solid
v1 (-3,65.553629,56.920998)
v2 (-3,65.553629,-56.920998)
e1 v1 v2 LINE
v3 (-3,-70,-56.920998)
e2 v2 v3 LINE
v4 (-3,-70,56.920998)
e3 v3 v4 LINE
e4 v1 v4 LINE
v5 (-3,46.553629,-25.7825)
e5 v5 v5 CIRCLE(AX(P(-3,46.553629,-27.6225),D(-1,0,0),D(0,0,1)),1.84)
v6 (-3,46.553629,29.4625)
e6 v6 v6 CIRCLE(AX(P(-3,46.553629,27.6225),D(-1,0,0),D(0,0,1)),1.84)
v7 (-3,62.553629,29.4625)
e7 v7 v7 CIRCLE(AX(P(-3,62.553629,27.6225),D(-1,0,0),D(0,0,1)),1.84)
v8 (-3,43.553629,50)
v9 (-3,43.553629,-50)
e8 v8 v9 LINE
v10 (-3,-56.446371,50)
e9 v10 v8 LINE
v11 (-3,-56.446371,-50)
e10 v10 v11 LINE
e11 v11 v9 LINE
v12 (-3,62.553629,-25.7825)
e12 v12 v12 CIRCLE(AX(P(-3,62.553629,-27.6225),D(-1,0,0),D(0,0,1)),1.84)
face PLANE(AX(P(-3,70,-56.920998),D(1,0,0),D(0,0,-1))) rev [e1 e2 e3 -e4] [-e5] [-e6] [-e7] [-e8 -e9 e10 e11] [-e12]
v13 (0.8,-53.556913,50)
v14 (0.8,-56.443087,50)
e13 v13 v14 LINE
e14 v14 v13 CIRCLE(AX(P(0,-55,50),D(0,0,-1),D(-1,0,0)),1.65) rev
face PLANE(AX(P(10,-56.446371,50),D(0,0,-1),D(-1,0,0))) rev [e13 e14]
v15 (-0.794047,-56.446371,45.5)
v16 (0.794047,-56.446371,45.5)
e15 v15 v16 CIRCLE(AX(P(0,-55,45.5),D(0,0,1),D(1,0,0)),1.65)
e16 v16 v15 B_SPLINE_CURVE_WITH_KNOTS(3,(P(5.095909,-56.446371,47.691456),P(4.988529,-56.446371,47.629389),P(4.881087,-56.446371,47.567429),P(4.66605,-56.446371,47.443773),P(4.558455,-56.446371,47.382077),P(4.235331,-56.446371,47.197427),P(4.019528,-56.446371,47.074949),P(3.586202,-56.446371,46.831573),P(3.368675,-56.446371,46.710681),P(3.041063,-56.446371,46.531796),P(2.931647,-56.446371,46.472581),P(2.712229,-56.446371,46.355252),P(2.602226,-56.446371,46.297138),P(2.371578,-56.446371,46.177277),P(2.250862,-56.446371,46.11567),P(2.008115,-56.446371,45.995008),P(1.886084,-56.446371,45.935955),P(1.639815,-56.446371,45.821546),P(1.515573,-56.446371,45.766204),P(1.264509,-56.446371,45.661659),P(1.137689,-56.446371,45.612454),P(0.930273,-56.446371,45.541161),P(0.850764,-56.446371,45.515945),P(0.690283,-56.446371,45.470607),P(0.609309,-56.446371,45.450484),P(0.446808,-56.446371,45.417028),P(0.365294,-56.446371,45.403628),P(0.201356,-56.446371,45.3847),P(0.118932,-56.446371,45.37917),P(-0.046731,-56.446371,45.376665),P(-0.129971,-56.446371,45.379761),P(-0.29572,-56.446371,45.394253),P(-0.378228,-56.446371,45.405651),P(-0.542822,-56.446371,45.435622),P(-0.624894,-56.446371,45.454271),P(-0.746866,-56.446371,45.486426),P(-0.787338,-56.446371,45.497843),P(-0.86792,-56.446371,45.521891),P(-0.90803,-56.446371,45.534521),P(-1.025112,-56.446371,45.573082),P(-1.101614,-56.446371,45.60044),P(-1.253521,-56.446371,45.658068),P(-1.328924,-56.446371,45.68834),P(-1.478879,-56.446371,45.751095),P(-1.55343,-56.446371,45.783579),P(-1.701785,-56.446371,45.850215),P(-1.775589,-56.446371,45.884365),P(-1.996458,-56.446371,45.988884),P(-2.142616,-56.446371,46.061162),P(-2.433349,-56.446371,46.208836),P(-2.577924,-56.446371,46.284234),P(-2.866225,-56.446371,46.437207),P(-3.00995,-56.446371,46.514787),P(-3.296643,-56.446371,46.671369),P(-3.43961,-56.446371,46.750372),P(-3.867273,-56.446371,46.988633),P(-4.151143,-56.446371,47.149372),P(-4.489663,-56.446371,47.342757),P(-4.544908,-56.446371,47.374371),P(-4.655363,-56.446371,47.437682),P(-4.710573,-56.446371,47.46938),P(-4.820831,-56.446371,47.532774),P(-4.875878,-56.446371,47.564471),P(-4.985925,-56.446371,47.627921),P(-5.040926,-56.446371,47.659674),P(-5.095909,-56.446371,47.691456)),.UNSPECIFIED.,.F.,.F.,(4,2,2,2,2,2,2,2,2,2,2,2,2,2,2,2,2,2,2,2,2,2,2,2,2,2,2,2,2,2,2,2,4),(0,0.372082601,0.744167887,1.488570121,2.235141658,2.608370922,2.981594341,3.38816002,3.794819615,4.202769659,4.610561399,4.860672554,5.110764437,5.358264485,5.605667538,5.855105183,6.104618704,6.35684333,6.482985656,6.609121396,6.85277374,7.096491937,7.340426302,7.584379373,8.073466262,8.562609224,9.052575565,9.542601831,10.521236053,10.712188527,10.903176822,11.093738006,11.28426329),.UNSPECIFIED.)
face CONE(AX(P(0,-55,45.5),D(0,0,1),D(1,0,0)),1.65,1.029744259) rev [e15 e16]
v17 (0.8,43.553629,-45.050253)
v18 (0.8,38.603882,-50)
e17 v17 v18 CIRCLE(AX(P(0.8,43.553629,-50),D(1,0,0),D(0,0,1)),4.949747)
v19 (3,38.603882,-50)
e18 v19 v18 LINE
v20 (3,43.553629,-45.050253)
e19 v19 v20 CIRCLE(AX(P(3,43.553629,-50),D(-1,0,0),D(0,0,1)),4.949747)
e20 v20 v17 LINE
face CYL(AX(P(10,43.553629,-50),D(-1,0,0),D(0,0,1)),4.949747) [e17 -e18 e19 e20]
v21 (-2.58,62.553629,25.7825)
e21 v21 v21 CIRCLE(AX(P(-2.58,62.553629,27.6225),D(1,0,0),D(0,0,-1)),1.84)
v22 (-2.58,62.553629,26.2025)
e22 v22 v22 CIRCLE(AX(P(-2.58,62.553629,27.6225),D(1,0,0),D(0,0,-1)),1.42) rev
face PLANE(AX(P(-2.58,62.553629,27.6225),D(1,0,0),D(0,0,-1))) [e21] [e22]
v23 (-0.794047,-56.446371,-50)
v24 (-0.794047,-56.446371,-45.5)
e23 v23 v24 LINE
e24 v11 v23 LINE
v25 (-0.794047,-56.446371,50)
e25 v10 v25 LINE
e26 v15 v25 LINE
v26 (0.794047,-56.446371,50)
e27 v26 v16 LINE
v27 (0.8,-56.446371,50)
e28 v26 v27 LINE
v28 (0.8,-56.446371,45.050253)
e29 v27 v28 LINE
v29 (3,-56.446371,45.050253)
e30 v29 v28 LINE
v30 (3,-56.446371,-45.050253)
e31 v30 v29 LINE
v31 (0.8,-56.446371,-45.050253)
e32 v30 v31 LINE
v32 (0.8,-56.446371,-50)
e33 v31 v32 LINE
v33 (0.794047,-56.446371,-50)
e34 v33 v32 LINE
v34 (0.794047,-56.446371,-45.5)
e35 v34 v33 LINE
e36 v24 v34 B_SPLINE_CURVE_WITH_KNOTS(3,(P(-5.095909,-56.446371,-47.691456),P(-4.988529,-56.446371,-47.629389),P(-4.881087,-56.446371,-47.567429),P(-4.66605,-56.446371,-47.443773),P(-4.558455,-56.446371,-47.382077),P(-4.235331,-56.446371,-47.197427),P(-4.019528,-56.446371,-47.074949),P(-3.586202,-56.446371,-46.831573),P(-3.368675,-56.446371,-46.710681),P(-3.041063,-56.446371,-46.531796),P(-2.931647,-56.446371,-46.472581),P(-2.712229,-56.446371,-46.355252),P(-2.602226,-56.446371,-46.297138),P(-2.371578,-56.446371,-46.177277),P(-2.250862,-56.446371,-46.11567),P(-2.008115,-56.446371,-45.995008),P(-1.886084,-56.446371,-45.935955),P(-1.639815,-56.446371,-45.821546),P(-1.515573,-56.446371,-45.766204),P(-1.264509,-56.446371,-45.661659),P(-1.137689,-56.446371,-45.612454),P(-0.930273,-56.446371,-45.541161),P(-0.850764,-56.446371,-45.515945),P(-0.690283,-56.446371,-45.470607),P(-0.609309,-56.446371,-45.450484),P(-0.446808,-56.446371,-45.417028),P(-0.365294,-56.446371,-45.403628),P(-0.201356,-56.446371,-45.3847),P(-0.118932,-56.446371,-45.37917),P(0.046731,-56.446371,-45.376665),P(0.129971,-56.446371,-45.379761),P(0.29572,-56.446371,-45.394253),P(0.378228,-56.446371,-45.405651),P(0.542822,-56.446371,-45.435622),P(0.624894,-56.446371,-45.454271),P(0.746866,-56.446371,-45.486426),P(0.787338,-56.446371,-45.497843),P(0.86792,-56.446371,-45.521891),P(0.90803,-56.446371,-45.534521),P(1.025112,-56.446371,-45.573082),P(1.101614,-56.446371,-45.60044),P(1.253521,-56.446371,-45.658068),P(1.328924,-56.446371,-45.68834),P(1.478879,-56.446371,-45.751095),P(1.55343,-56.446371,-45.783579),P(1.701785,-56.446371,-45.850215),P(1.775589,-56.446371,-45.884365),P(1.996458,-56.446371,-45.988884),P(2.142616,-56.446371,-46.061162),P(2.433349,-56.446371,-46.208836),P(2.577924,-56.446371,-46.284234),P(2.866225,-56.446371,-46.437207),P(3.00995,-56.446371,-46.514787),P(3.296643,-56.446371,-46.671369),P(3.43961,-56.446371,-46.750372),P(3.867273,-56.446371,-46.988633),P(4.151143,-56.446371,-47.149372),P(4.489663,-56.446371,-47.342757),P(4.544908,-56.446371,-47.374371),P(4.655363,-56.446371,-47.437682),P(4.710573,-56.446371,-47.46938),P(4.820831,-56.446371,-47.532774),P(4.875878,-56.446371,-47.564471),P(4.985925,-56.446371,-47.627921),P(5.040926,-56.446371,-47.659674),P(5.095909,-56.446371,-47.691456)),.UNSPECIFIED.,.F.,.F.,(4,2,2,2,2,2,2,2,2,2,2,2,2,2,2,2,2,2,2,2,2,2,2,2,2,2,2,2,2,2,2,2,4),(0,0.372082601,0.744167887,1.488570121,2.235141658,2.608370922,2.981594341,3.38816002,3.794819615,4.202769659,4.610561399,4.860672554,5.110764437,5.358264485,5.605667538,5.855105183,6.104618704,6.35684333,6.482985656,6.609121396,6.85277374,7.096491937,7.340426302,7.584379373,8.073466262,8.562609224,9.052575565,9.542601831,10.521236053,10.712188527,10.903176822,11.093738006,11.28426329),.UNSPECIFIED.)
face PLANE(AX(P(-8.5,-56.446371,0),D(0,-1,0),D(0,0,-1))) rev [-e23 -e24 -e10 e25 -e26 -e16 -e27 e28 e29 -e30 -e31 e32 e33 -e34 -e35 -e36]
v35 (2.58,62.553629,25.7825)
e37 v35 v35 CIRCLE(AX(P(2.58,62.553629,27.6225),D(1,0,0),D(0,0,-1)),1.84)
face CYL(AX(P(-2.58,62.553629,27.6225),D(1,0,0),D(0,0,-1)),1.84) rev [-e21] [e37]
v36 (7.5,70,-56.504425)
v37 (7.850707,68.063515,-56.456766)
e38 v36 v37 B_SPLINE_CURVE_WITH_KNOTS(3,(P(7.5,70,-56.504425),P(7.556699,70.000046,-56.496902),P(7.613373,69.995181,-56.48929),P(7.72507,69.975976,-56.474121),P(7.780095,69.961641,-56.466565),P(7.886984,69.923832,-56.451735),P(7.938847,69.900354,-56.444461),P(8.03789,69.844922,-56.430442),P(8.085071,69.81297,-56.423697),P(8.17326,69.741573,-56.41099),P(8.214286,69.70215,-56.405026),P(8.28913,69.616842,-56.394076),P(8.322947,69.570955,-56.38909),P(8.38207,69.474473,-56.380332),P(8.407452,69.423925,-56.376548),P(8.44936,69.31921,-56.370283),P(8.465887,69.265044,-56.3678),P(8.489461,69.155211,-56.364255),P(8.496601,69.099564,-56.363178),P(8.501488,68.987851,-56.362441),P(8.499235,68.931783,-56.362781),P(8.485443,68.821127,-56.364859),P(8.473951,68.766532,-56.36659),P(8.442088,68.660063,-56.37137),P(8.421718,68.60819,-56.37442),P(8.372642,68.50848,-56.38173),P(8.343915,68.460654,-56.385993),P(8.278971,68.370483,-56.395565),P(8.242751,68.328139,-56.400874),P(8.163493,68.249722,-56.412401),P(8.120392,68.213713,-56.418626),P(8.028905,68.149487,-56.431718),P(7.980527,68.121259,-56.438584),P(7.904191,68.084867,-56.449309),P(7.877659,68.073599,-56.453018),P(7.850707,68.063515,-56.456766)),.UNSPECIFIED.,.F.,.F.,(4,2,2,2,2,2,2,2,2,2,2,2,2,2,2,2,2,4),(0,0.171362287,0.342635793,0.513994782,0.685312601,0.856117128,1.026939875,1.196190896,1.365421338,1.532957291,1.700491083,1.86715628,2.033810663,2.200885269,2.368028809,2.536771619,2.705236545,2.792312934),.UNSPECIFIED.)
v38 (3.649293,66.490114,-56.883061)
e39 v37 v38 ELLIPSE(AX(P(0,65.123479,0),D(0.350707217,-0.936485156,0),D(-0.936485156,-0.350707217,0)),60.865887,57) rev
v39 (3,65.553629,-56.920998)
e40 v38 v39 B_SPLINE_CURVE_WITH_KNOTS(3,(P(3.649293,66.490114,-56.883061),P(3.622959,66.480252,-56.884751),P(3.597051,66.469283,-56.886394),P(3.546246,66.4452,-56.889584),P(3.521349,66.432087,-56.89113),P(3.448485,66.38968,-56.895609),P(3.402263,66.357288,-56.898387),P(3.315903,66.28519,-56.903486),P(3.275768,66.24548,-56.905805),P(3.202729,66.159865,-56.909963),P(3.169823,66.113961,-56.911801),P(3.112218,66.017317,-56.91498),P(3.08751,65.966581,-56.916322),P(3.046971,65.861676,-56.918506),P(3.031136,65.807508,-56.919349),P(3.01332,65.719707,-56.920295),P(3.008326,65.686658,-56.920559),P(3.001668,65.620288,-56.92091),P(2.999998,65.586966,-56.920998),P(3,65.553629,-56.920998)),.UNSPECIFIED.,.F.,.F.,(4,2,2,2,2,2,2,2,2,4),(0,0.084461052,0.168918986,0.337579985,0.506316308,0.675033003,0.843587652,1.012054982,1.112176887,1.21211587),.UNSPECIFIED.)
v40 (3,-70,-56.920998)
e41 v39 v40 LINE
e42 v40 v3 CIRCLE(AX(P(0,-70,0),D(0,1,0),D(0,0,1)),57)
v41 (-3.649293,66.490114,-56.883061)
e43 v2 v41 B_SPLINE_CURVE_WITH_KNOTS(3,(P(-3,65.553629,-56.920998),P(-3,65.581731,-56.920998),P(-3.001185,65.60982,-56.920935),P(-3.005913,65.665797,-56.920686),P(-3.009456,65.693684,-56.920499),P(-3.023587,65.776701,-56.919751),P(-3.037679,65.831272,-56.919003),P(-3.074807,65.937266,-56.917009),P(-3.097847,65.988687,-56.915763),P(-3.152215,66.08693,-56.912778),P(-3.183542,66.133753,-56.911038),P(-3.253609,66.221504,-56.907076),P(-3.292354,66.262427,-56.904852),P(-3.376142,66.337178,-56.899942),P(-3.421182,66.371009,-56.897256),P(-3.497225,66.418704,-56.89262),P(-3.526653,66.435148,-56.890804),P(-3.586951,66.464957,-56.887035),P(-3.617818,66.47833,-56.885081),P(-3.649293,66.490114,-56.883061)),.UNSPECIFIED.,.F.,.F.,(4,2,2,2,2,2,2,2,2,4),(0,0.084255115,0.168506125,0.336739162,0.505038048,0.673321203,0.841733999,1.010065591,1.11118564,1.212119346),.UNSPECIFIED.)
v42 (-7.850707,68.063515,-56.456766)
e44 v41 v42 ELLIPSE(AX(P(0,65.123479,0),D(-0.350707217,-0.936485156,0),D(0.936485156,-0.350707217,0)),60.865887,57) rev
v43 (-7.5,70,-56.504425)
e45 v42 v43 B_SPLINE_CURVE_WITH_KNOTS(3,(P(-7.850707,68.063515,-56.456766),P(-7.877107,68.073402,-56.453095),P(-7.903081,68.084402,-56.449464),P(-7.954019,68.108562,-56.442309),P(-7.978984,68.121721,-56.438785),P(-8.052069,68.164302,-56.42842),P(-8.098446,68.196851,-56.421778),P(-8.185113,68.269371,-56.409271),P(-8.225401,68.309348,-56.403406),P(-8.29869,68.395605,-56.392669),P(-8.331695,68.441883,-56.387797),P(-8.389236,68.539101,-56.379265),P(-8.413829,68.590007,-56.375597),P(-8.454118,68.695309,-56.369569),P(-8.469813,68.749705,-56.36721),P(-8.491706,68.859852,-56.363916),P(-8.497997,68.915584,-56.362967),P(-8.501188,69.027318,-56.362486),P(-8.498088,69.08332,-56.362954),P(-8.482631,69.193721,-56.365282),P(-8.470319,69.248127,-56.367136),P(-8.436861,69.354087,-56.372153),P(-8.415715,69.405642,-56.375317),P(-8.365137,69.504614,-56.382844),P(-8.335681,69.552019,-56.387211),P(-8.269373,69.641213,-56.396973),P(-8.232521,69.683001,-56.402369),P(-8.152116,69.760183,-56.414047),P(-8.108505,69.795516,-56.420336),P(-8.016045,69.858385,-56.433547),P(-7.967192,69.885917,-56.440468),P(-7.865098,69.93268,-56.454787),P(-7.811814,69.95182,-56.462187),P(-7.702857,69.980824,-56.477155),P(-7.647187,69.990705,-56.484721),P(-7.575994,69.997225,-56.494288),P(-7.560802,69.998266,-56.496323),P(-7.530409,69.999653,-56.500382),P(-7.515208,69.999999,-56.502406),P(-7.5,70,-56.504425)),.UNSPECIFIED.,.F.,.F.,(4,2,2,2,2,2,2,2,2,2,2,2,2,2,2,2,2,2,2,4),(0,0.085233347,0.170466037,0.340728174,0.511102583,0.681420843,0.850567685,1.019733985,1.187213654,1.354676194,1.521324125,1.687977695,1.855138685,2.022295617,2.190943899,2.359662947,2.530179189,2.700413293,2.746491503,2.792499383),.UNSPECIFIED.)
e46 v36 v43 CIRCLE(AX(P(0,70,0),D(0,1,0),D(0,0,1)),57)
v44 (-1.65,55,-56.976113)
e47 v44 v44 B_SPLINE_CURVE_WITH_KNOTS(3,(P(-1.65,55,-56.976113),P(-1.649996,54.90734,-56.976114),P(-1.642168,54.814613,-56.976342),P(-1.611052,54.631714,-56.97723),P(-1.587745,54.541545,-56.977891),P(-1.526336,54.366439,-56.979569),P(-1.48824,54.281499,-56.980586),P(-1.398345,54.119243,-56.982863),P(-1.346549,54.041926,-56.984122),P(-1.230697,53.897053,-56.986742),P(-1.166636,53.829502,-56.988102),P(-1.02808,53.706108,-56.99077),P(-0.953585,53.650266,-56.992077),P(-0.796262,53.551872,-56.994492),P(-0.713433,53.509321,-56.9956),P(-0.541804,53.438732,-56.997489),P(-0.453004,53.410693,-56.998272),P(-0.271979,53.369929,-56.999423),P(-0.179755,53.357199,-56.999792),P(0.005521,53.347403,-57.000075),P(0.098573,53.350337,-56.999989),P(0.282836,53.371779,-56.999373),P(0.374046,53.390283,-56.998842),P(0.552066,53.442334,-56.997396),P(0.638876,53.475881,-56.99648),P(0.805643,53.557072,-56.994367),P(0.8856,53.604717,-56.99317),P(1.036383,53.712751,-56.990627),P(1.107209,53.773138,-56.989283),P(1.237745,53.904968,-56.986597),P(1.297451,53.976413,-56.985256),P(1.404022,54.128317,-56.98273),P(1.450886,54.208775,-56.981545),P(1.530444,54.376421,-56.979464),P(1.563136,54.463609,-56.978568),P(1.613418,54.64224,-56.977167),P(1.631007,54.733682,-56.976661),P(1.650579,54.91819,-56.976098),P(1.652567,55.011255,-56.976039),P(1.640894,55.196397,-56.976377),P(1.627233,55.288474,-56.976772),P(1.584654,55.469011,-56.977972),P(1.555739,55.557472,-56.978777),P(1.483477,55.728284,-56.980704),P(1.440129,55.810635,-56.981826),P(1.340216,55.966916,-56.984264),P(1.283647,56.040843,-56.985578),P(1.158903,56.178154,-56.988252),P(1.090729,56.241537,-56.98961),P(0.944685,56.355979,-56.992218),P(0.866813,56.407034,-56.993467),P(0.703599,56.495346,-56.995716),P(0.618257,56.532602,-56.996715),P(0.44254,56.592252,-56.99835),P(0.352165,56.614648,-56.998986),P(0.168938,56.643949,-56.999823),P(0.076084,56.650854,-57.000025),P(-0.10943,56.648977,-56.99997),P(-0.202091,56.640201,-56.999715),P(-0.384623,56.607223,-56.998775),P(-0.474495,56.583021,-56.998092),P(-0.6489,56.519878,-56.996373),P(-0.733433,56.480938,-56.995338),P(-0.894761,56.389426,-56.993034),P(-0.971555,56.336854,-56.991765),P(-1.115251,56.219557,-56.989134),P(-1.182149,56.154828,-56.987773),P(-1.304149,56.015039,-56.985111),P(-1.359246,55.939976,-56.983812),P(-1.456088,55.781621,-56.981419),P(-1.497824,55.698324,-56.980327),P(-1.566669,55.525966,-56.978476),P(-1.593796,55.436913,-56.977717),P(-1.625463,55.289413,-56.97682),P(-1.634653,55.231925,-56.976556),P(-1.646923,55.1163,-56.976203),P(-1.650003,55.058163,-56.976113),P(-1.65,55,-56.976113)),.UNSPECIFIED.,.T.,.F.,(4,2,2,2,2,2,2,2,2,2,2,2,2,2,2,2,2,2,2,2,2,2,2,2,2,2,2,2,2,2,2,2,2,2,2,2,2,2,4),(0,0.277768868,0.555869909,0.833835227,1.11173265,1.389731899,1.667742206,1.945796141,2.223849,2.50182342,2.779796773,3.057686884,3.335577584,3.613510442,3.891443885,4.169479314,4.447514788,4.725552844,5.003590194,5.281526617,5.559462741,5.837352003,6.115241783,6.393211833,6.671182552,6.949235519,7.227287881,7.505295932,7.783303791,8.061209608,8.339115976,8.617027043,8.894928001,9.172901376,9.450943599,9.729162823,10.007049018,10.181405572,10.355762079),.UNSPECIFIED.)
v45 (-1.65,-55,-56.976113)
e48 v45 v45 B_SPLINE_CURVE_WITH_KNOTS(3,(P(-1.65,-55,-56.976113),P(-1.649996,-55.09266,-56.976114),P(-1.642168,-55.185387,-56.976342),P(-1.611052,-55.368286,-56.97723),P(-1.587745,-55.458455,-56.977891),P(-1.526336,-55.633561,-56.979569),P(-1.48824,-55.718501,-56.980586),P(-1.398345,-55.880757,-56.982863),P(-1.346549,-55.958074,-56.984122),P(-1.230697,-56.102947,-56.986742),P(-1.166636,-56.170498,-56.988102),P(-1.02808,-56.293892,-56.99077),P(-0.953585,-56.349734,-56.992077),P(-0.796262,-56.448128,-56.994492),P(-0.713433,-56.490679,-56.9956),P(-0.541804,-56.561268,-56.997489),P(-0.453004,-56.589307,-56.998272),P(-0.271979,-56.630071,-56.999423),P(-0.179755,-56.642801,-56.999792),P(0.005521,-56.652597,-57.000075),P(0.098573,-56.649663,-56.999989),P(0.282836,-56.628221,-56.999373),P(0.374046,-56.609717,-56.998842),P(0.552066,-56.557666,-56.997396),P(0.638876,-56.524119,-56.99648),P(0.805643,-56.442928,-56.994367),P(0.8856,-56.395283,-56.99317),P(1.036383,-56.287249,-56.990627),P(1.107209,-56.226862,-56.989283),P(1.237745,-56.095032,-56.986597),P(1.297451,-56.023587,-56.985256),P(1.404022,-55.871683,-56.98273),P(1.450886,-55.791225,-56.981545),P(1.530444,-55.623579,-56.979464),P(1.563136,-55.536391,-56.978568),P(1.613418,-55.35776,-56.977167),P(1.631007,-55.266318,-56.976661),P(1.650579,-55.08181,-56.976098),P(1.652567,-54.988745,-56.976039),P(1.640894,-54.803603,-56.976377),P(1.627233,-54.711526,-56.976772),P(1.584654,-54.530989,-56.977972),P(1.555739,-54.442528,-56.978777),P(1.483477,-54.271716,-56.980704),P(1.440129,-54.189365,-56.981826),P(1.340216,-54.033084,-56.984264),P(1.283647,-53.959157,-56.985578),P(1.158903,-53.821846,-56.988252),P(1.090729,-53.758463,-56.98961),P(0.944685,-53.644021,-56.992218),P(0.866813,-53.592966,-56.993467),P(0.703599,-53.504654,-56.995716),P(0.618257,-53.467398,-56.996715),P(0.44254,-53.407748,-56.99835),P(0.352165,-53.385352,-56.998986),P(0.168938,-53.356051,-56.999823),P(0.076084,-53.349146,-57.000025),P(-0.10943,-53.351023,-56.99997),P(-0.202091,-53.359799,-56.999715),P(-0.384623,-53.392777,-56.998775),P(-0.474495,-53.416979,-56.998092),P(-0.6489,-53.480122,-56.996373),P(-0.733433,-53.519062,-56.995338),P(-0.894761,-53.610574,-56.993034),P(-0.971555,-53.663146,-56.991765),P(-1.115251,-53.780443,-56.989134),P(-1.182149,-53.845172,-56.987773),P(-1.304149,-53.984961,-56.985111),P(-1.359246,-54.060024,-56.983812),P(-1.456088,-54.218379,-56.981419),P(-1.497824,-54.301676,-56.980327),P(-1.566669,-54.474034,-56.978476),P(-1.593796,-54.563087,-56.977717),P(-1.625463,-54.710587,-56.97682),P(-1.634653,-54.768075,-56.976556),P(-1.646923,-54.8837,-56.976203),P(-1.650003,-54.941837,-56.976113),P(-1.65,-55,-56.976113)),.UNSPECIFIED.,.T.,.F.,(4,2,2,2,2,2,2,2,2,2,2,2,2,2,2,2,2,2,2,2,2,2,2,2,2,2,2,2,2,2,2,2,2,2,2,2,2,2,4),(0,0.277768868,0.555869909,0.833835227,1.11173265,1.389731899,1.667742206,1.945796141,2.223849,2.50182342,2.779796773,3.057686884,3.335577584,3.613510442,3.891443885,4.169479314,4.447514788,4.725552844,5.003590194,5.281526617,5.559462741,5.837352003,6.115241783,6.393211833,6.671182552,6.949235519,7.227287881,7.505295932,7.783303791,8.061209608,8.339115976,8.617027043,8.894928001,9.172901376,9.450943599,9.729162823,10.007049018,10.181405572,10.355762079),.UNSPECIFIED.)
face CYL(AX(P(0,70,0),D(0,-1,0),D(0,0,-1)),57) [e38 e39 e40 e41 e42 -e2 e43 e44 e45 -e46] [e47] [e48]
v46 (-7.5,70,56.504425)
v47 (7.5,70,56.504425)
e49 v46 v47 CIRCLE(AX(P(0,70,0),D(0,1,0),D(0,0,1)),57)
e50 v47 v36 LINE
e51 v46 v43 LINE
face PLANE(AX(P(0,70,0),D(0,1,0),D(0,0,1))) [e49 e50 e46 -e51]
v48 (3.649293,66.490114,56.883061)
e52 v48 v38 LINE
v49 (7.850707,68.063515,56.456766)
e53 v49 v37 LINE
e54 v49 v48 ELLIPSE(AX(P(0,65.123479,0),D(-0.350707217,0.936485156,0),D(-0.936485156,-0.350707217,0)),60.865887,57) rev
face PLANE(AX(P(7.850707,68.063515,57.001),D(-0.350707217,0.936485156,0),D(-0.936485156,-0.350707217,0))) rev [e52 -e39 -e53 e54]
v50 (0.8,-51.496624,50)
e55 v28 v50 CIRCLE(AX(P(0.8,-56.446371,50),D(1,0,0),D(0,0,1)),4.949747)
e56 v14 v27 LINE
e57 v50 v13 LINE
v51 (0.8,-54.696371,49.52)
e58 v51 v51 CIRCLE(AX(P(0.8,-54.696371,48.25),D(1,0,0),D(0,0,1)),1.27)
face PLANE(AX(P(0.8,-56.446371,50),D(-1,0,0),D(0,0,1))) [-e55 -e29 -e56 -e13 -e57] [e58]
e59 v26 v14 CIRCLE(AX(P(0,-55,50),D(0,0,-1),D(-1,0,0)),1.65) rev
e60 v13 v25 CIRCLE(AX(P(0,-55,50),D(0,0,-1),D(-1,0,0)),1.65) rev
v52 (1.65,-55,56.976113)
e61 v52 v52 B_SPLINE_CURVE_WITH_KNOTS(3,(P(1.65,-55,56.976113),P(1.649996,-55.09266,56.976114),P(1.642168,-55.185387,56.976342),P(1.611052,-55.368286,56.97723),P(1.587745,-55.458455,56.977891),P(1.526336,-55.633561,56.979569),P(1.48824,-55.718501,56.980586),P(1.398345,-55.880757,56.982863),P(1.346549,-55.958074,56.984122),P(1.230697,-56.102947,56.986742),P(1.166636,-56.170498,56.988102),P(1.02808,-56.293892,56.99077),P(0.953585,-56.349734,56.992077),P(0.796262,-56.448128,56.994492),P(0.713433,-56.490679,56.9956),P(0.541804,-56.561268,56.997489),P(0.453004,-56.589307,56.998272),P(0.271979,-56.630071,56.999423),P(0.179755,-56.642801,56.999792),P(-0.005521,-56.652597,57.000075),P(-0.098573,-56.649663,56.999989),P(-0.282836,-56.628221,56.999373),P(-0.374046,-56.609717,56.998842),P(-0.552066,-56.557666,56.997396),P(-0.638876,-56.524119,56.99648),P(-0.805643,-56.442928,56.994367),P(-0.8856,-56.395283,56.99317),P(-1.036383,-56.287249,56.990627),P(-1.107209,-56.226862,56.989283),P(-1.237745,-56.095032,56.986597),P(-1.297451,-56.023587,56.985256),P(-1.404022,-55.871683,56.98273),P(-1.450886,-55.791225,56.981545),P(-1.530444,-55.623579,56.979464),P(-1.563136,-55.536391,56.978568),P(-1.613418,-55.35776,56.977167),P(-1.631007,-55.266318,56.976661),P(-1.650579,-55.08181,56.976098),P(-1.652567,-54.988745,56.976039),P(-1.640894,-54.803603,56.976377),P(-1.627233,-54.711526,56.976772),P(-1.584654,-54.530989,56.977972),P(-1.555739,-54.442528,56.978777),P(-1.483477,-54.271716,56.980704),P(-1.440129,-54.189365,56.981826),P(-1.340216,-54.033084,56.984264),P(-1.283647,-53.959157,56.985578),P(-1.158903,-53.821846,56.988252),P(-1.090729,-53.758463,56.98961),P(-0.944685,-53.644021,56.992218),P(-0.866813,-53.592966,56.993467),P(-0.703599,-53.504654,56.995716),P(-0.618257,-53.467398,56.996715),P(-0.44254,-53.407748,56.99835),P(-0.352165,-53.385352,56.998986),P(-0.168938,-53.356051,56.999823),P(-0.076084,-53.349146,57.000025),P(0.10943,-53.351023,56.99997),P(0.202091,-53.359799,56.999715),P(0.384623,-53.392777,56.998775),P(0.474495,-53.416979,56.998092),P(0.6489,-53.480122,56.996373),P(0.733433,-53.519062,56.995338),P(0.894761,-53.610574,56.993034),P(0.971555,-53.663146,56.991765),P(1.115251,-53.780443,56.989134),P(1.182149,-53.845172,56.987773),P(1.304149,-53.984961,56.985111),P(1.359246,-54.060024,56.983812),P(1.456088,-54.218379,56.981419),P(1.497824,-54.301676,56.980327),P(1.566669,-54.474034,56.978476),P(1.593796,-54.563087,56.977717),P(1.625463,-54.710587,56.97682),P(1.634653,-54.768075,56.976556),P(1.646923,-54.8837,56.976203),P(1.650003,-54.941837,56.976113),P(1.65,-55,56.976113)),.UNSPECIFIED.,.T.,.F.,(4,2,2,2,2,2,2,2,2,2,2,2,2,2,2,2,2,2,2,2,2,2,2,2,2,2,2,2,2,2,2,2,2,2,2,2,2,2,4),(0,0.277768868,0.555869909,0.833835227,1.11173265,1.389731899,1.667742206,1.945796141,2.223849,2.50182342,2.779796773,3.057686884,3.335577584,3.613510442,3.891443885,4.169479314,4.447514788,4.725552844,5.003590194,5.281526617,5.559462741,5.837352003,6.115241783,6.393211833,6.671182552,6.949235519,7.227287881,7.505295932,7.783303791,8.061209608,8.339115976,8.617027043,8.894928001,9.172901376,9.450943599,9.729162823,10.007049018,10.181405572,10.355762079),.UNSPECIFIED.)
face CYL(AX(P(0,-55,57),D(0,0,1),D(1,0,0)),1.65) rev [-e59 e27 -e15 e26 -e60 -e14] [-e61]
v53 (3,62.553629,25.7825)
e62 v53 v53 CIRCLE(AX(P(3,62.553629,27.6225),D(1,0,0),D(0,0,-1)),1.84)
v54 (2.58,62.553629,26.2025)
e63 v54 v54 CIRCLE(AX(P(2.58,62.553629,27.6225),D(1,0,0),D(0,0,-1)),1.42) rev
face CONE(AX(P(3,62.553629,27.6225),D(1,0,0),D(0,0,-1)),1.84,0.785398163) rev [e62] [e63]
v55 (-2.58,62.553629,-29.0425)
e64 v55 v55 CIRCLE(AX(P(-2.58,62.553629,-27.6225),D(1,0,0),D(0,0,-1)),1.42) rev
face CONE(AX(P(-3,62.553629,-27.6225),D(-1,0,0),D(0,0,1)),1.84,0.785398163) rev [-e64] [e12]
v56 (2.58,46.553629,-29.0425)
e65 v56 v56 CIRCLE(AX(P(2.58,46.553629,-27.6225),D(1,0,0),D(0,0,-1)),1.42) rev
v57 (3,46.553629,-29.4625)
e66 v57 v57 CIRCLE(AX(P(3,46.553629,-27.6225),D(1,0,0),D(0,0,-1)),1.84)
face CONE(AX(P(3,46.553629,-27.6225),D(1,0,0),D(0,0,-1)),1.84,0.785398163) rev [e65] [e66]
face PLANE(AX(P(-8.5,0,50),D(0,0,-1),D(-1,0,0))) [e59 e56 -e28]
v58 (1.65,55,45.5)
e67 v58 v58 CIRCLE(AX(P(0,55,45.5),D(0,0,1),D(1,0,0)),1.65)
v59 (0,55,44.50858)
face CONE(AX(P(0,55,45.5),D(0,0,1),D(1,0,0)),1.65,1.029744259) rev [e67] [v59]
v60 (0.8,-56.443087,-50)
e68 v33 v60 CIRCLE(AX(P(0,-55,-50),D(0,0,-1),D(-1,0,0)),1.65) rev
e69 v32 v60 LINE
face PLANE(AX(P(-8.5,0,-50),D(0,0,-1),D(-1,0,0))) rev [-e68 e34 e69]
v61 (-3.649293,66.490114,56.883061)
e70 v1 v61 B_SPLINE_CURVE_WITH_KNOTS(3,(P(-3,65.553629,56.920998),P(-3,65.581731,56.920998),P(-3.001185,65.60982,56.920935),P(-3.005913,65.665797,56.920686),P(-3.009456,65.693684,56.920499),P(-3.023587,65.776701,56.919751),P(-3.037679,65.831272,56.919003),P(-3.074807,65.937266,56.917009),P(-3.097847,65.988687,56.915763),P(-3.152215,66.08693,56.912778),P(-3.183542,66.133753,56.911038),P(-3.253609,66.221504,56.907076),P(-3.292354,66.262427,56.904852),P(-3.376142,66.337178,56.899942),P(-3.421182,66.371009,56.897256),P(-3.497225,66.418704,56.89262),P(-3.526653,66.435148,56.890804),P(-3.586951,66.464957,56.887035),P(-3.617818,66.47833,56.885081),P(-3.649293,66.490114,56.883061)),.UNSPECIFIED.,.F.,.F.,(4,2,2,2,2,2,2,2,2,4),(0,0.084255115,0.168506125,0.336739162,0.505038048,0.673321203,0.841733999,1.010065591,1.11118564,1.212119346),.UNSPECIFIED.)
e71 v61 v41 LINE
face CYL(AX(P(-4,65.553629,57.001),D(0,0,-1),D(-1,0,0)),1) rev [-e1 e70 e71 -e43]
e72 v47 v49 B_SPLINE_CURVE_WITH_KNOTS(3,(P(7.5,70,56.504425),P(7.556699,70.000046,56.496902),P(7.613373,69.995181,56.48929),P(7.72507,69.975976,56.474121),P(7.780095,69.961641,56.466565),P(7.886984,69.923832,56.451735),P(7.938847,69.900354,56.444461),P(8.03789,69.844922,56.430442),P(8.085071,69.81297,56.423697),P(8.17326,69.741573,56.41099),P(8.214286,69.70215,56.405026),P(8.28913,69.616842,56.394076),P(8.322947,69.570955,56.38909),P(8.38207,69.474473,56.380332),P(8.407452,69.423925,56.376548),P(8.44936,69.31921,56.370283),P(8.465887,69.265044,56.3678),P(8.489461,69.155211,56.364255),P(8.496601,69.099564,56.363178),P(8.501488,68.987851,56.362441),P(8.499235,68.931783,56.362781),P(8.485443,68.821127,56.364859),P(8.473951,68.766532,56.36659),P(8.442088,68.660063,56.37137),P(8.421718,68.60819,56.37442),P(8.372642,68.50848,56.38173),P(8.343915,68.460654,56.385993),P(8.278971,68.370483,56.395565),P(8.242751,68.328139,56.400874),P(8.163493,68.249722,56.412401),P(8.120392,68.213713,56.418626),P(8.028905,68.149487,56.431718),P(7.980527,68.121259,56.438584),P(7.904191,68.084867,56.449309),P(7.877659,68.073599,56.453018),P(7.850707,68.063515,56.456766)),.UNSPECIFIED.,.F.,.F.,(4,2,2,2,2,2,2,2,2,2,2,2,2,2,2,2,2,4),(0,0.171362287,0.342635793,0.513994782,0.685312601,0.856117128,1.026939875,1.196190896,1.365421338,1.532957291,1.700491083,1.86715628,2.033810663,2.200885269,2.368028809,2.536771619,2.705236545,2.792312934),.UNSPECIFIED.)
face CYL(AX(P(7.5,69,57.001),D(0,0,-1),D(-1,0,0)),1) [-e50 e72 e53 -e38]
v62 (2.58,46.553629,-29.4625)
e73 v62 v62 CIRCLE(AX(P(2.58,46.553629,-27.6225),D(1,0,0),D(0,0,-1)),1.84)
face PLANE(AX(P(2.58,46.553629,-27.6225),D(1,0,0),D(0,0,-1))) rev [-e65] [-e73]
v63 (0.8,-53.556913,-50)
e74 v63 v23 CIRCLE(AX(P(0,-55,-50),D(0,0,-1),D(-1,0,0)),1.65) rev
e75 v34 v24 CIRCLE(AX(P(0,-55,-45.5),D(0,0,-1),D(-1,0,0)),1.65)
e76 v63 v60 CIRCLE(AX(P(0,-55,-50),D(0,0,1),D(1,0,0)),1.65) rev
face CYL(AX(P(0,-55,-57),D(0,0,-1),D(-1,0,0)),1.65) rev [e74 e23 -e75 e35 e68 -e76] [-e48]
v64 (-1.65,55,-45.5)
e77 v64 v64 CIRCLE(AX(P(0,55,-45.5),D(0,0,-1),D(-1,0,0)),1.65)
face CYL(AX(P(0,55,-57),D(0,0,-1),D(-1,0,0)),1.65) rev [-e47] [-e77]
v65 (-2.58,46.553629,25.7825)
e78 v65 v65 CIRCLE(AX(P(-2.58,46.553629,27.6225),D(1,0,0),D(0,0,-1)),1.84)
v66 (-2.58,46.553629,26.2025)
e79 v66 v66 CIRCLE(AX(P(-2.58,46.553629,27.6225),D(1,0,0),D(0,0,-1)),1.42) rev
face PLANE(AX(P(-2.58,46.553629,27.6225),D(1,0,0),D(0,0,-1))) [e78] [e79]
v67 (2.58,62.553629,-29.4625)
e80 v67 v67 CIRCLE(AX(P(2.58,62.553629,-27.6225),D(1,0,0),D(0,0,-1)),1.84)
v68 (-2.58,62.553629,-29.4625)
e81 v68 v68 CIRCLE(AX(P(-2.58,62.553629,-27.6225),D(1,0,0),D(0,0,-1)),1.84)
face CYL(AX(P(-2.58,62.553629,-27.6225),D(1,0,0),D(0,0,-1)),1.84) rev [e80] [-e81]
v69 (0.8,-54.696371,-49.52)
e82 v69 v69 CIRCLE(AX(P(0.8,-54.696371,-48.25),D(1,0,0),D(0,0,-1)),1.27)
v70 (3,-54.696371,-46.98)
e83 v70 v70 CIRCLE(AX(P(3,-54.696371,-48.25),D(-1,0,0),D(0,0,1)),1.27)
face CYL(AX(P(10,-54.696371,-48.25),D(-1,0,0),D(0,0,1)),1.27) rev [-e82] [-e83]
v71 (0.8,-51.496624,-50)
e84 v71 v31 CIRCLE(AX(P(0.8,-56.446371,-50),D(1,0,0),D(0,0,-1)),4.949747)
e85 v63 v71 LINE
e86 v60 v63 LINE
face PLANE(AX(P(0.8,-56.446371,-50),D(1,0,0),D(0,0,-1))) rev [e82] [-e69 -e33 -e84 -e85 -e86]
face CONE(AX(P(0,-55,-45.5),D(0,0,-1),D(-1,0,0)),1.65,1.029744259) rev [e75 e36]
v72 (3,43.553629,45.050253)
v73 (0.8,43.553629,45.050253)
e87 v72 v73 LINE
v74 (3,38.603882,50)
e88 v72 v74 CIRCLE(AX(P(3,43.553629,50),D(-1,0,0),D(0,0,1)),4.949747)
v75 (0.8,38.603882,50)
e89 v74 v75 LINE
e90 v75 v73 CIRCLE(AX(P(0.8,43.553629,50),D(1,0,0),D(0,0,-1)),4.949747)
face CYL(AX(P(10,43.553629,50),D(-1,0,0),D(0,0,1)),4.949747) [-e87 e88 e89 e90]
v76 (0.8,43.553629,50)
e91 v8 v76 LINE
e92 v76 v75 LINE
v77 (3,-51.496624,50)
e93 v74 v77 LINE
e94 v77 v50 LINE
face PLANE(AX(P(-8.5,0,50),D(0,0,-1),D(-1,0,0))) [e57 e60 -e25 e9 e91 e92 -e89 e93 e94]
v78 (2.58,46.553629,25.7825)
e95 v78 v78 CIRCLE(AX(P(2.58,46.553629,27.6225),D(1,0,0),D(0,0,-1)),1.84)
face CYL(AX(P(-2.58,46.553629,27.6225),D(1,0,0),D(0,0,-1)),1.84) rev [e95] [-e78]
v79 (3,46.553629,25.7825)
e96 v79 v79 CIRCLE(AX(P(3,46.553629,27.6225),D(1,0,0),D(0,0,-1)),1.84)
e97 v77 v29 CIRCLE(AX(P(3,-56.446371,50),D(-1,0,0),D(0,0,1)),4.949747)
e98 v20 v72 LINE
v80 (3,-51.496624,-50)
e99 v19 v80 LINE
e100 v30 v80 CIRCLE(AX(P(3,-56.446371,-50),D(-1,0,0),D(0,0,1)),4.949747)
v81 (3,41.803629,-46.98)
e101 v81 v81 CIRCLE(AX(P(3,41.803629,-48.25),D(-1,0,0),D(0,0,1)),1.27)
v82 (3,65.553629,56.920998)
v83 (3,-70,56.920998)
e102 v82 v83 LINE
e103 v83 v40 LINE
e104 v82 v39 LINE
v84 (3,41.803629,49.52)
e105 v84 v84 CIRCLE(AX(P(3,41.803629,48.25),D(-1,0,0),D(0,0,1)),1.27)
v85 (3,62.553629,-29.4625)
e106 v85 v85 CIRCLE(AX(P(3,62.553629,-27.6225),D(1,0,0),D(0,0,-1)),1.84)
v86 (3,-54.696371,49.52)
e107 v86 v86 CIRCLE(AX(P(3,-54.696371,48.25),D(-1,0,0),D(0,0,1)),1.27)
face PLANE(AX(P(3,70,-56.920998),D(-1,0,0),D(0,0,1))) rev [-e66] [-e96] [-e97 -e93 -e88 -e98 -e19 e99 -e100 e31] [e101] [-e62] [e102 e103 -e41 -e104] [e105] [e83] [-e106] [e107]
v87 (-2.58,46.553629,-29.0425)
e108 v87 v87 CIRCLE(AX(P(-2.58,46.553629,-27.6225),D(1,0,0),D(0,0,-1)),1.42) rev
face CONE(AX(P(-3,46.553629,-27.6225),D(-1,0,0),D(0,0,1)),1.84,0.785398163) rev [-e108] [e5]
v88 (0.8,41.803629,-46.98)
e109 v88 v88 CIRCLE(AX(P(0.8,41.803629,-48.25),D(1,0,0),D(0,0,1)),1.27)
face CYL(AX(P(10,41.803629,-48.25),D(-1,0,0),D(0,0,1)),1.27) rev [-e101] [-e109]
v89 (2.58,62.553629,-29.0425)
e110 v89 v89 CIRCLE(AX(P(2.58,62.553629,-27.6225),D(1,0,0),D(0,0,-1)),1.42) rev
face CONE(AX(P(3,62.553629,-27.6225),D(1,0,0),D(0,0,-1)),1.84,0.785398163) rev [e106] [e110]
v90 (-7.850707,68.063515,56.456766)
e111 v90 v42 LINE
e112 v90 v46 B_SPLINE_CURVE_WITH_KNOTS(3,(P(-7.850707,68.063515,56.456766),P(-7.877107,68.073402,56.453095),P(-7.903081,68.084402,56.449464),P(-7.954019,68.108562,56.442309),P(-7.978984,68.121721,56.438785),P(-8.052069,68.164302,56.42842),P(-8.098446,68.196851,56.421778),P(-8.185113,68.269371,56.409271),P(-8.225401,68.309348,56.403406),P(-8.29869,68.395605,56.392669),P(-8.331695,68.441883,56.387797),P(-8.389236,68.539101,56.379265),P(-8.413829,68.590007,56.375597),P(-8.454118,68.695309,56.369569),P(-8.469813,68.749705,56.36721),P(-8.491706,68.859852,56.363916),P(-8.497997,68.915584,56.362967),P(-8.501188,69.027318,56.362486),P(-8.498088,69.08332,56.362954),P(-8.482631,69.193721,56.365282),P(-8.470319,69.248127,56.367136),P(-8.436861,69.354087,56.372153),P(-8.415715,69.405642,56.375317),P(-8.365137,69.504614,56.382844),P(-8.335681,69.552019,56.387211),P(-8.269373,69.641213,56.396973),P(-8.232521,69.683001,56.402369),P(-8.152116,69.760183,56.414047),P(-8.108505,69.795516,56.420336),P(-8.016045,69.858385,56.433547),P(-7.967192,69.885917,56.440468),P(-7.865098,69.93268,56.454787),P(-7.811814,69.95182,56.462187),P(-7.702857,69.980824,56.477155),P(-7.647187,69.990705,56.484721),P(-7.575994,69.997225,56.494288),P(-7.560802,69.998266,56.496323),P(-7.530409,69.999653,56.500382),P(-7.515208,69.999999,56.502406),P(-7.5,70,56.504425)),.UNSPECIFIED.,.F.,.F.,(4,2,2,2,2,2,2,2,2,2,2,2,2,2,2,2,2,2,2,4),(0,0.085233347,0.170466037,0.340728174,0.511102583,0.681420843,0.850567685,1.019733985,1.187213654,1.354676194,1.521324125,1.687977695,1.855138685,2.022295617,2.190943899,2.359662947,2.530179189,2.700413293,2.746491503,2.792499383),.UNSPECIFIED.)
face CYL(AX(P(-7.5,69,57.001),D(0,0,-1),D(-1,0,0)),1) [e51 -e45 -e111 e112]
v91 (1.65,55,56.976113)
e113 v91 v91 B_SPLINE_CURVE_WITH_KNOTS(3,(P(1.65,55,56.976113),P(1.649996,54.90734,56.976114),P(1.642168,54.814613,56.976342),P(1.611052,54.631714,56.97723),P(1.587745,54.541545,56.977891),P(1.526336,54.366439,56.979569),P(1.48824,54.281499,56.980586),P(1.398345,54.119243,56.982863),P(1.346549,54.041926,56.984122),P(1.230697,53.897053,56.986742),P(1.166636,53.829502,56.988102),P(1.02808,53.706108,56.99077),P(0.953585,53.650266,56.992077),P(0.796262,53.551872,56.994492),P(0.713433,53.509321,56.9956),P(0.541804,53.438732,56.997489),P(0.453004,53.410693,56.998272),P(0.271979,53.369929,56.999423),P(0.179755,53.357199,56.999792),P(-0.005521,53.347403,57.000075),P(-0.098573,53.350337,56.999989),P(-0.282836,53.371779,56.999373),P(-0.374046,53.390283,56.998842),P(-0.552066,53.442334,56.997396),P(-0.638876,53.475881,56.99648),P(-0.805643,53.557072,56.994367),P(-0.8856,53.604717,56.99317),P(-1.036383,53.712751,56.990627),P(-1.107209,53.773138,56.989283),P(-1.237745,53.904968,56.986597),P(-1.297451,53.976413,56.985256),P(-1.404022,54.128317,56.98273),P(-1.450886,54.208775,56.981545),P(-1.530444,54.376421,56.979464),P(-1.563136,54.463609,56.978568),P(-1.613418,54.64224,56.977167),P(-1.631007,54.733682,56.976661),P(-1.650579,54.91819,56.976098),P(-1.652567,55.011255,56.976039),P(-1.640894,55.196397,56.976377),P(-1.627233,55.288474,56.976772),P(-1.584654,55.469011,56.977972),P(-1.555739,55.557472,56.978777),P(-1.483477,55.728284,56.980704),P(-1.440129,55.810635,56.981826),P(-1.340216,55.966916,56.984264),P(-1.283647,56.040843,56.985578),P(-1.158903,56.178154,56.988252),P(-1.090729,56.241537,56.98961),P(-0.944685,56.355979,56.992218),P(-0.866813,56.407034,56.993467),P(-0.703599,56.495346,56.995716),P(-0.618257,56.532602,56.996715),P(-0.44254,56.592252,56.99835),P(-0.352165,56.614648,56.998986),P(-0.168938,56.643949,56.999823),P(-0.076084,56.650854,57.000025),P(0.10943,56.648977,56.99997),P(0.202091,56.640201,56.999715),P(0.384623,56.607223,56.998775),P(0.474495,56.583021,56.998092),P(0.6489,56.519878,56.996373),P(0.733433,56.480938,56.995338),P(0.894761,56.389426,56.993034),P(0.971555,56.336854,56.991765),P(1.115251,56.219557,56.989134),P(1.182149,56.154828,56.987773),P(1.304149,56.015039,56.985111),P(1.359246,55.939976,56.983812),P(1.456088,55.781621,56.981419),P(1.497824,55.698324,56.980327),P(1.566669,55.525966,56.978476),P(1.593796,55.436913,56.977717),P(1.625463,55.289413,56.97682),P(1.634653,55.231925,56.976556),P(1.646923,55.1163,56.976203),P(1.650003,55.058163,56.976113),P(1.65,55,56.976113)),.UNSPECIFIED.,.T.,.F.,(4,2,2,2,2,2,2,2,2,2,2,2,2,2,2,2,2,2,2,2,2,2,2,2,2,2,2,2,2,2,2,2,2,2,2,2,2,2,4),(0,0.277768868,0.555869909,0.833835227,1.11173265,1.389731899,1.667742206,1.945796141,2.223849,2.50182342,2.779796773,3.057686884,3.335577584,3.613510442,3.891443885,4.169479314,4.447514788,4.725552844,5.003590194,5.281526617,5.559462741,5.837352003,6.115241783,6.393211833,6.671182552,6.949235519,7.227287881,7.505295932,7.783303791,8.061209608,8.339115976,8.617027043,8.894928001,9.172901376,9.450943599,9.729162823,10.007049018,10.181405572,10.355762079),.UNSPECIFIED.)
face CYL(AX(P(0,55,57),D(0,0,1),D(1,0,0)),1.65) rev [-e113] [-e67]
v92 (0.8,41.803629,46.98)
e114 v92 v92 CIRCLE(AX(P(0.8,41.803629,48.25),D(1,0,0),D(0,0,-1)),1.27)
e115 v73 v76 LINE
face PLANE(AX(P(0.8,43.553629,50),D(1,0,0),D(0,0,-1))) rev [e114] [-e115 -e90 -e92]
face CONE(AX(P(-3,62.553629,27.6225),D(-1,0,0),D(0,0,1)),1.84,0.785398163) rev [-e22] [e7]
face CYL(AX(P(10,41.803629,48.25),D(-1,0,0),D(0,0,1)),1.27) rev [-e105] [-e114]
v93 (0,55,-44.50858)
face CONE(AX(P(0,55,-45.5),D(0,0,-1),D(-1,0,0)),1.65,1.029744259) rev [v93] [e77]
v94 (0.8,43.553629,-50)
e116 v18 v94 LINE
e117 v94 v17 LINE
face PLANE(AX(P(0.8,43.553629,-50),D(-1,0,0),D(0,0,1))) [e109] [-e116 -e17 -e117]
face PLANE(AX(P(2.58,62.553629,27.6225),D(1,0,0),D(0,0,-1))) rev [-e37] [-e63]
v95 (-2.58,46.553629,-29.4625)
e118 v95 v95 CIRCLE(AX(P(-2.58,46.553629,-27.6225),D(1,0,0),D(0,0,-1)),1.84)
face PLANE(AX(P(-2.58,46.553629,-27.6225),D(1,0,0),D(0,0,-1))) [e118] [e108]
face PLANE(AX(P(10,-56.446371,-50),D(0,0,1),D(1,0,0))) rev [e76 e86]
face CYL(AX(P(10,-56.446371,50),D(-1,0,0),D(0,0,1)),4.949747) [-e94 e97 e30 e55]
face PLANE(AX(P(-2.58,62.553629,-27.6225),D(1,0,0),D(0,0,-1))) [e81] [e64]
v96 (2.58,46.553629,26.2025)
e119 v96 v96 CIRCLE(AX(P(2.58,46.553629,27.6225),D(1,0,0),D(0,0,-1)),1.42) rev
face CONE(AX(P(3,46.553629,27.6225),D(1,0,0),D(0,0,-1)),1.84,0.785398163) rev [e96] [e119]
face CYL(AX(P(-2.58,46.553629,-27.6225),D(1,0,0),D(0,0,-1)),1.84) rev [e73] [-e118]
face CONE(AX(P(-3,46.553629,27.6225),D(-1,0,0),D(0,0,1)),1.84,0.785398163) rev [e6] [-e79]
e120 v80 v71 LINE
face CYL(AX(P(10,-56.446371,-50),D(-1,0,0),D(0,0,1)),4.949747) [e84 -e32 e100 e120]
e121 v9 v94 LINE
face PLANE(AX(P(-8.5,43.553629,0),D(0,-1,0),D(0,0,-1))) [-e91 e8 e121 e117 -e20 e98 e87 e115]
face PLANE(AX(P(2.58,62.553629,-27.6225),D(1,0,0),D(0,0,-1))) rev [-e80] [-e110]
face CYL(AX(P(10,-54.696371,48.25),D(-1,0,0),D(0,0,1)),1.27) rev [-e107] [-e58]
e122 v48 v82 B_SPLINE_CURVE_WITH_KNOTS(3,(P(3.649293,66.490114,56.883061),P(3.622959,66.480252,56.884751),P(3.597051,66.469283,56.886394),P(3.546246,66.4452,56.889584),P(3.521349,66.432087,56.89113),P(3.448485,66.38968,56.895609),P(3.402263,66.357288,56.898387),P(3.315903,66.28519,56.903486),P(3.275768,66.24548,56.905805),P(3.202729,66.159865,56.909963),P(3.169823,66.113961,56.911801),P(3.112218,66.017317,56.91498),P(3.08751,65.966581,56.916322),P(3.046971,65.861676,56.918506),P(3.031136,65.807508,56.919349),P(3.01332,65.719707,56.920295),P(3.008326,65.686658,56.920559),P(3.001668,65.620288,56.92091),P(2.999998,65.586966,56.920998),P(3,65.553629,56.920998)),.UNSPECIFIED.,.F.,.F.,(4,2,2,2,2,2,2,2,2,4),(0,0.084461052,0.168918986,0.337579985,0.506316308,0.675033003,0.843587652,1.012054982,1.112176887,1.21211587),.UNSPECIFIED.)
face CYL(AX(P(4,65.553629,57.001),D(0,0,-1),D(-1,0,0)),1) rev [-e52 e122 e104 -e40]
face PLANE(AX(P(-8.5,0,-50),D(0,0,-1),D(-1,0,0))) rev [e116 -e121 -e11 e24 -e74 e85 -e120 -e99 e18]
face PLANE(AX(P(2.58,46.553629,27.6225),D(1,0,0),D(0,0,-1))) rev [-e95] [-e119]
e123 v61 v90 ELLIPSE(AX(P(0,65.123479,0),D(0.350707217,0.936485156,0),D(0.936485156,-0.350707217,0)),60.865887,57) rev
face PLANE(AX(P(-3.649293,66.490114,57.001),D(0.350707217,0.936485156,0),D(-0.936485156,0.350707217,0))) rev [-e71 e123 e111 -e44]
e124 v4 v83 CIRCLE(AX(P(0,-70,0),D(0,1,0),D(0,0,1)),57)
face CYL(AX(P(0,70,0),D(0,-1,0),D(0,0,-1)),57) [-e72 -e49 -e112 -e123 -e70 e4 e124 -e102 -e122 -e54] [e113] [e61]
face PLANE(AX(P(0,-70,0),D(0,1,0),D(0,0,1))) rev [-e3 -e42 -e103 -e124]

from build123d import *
from build123d.topology import SkipClean

# Parameters (mm, degrees)
BOSS_EXTRUDE1_DEPTH                  = 70
M4_TAPPED_HOLE1_D                    = 3.3
M4_TAPPED_HOLE1_DEPTH                = 11.5
M4_TAPPED_HOLE1_TIP                  = 0.991420021
M4_TAPPED_HOLE1_ON_FACE_2_D          = 3.3
M4_TAPPED_HOLE1_ON_FACE_2_DEPTH      = 11.5
M4_TAPPED_HOLE1_ON_FACE_2_TIP        = 0.991420021
BOSS_EXTRUDE3_REACH                  = 92.322
BOSS_EXTRUDE3_END_RADIUS             = 57
BOSS_EXTRUDE3_DIRECTION_2_REACH      = 92.322
BOSS_EXTRUDE3_DIRECTION_2_END_RADIUS = 57
CUT_EXTRUDE4_DEPTH                   = 91.671109116
CUT_EXTRUDE4_DEPTH_BACK              = 91.671109116
SKETCH5_W                            = 100
SKETCH5_H                            = 100
BOSS_EXTRUDE4_START                  = 0.8
SKETCH6_R                            = 1.27
BOSS_EXTRUDE4_DEPTH                  = 2.2
SKETCH12_R                           = 1.84
CUT_EXTRUDE6_DEPTH                   = 2.58


# Read off the part's stored shape, not the designer's step: Hole1
with BuildPart() as part:
    # Sketch1 → Boss-Extrude1 (new, symmetric)
    with BuildSketch(Plane(origin=(0, 0, 0), x_dir=(1, 0, 0), z_dir=(0, 1, 0))):
        with BuildLine():
            Line((-3, 56.920997883), (-3, -56.920997883))
            ThreePointArc((-3, -56.920997883), (0, -57), (3, -56.920997883))
            Line((3, -56.920997883), (3, 56.920997883))
            ThreePointArc((3, 56.920997883), (0, 57), (-3, 56.920997883))
        make_face()
    extrude(amount=BOSS_EXTRUDE1_DEPTH, both=True)

    # M4 Tapped Hole1
    with Locations(Plane(origin=(0, 55, 57), x_dir=(1, 0, 0), z_dir=(0, 0, 1))):
        with Locations((0, 0), (0, -110)):
            Hole(M4_TAPPED_HOLE1_D / 2, depth=M4_TAPPED_HOLE1_DEPTH)
            with Locations((0, 0, -(M4_TAPPED_HOLE1_DEPTH + M4_TAPPED_HOLE1_TIP / 2))):  # 118° drill point
                Cone(0, M4_TAPPED_HOLE1_D / 2, M4_TAPPED_HOLE1_TIP, mode=Mode.SUBTRACT)

    # M4 Tapped Hole1 on face 2
    with Locations(Plane(origin=(0, 55, -57), x_dir=(-1, 0, 0), z_dir=(0, 0, -1))):
        with Locations((0, 0), (0, -110)):
            Hole(M4_TAPPED_HOLE1_ON_FACE_2_D / 2, depth=M4_TAPPED_HOLE1_ON_FACE_2_DEPTH)
            with Locations((0, 0, -(M4_TAPPED_HOLE1_ON_FACE_2_DEPTH + M4_TAPPED_HOLE1_ON_FACE_2_TIP / 2))):  # 118° drill point
                Cone(0, M4_TAPPED_HOLE1_ON_FACE_2_D / 2, M4_TAPPED_HOLE1_ON_FACE_2_TIP, mode=Mode.SUBTRACT)

    # Boss-Extrude3: up to this cylinder (the profile starts inside it)
    with SkipClean():  # the faces are left unmerged after this step: merging them gives an invalid solid
        boss_extrude3_end = Plane(origin=(0, 67.695148, 0), z_dir=(0, -1, 0)) * Cylinder(BOSS_EXTRUDE3_END_RADIUS, 299.644, mode=Mode.PRIVATE)
        # Sketch4 → Boss-Extrude3 (add, up to the surface)
        with BuildSketch(Plane.XY, mode=Mode.PRIVATE) as boss_extrude3_sk1:
            with BuildLine():
                Line((-7.5, 70), (7.5, 70))
                ThreePointArc((7.5, 70), (8.48399318, 69.178206122), (7.850707217, 68.063514844))
                Line((7.850707217, 68.063514844), (3.649292783, 66.490114182))
                ThreePointArc((3.649292783, 66.490114182), (3.178200993, 66.123406518), (3, 65.553629026))
                Line((3, 65.553629026), (3, 64))
                Line((3, 64), (-3, 64))
                Line((-3, 64), (-3, 65.553629026))
                ThreePointArc((-3, 65.553629026), (-3.178200993, 66.123406518), (-3.649292783, 66.490114182))
                Line((-3.649292783, 66.490114182), (-7.850707217, 68.063514844))
                ThreePointArc((-7.850707217, 68.063514844), (-8.48399318, 69.178206122), (-7.5, 70))
            make_face()
        boss_extrude3_tool1 = extrude(boss_extrude3_sk1.sketch, amount=BOSS_EXTRUDE3_REACH, mode=Mode.PRIVATE) & boss_extrude3_end
        add(boss_extrude3_tool1.solids().sort_by_distance((0, 67.695148, 0))[0])

    # Boss-Extrude3 direction 2: up to this cylinder (the profile starts inside it)
    with SkipClean():  # the faces are left unmerged after this step: merging them gives an invalid solid
        boss_extrude3_direction_2_end = Plane(origin=(0, 67.695148, 0), z_dir=(0, -1, 0)) * Cylinder(BOSS_EXTRUDE3_DIRECTION_2_END_RADIUS, 299.644, mode=Mode.PRIVATE)
        # Sketch4 → Boss-Extrude3 direction 2 (add, up to the surface)
        with BuildSketch(Plane.XY, mode=Mode.PRIVATE) as boss_extrude3_direction_2_sk1:
            with BuildLine():
                Line((-7.5, 70), (7.5, 70))
                ThreePointArc((7.5, 70), (8.48399318, 69.178206122), (7.850707217, 68.063514844))
                Line((7.850707217, 68.063514844), (3.649292783, 66.490114182))
                ThreePointArc((3.649292783, 66.490114182), (3.178200993, 66.123406518), (3, 65.553629026))
                Line((3, 65.553629026), (3, 64))
                Line((3, 64), (-3, 64))
                Line((-3, 64), (-3, 65.553629026))
                ThreePointArc((-3, 65.553629026), (-3.178200993, 66.123406518), (-3.649292783, 66.490114182))
                Line((-3.649292783, 66.490114182), (-7.850707217, 68.063514844))
                ThreePointArc((-7.850707217, 68.063514844), (-8.48399318, 69.178206122), (-7.5, 70))
            make_face()
        boss_extrude3_direction_2_tool1 = extrude(boss_extrude3_direction_2_sk1.sketch, amount=-BOSS_EXTRUDE3_DIRECTION_2_REACH, mode=Mode.PRIVATE) & boss_extrude3_direction_2_end
        add(boss_extrude3_direction_2_tool1.solids().sort_by_distance((0, 67.695148, 0))[0])

    # Sketch5 → Cut-Extrude4 (cut, two sides: drawn at the far end of the back side and taken through both)
    with SkipClean():  # the faces are left unmerged after this step: merging them gives an invalid solid
        with BuildSketch(Plane(origin=(0, 0, 0), x_dir=(0, 0, -1), z_dir=(1, 0, 0)).offset(-CUT_EXTRUDE4_DEPTH_BACK)):
            with Locations((0, -6.446370974)):
                Rectangle(SKETCH5_W, SKETCH5_H)
        extrude(amount=CUT_EXTRUDE4_DEPTH + CUT_EXTRUDE4_DEPTH_BACK, mode=Mode.SUBTRACT)

    # Sketch6 → Boss-Extrude4 (add)
    # profile 1 of 4: a face of its own
    with SkipClean():  # the faces are left unmerged after this step: merging them gives an invalid solid
        with BuildSketch(Plane(origin=(0, 0, 0), x_dir=(0, 0, -1), z_dir=(1, 0, 0)).offset(BOSS_EXTRUDE4_START)):
            with BuildLine():
                Line((50, 43.553629026), (50, 38.603881557))
                ThreePointArc((50, 38.603881557), (46.5, 40.053629026), (45.050252532, 43.553629026))
                Line((45.050252532, 43.553629026), (50, 43.553629026))
            make_face()
            with Locations(Location((48.25, 41.803629026, 0), (0, 0, 180))):
                Circle(SKETCH6_R, mode=Mode.SUBTRACT)
        # profile 2 of 4: a face of its own
        with BuildSketch(Plane(origin=(0, 0, 0), x_dir=(0, 0, -1), z_dir=(1, 0, 0)).offset(BOSS_EXTRUDE4_START)):
            with BuildLine():
                Line((-50, 43.553629026), (-45.050252532, 43.553629026))
                ThreePointArc((-45.050252532, 43.553629026), (-46.5, 40.053629026), (-50, 38.603881557))
                Line((-50, 38.603881557), (-50, 43.553629026))
            make_face()
            with Locations(Location((-48.25, 41.803629026, 0), (0, 0, 180))):
                Circle(SKETCH6_R, mode=Mode.SUBTRACT)
        # profile 3 of 4: a face of its own
        with BuildSketch(Plane(origin=(0, 0, 0), x_dir=(0, 0, -1), z_dir=(1, 0, 0)).offset(BOSS_EXTRUDE4_START)):
            with BuildLine():
                Line((-50, -56.446370974), (-50, -51.496623506))
                ThreePointArc((-50, -51.496623506), (-46.5, -52.946370974), (-45.050252532, -56.446370974))
                Line((-45.050252532, -56.446370974), (-50, -56.446370974))
            make_face()
            with Locations(Location((-48.25, -54.696370974, 0), (0, 0, 180))):
                Circle(SKETCH6_R, mode=Mode.SUBTRACT)
        # profile 4 of 4: a face of its own
        with BuildSketch(Plane(origin=(0, 0, 0), x_dir=(0, 0, -1), z_dir=(1, 0, 0)).offset(BOSS_EXTRUDE4_START)):
            with BuildLine():
                Line((50, -56.446370974), (45.050252532, -56.446370974))
                ThreePointArc((45.050252532, -56.446370974), (46.5, -52.946370974), (50, -51.496623506))
                Line((50, -51.496623506), (50, -56.446370974))
            make_face()
            with Locations(Location((48.25, -54.696370974, 0), (0, 0, 180))):
                Circle(SKETCH6_R, mode=Mode.SUBTRACT)
        extrude(amount=BOSS_EXTRUDE4_DEPTH)

    # Hole1 outline → Hole1 (revolve, cut)
    with SkipClean():  # the faces are left unmerged after this step: merging them gives an invalid solid
        with BuildSketch(Plane(origin=(0, 46.553629026, -27.6225), x_dir=(0, 1, 0), z_dir=(0, 0, -1))):
            Polygon((0, -3), (1.42, -3), (1.42, 2.58), (1.84, 3), (0, 3), align=None)
        hole1 = revolve(axis=Axis((0, 46.553629026, -27.6225), (1, 0, 0)), mode=Mode.SUBTRACT)

    # Hole1 2 outline → Hole1 2 (revolve, cut)
    with SkipClean():  # the faces are left unmerged after this step: merging them gives an invalid solid
        with BuildSketch(Plane(origin=(0, 62.553629026, 27.6225), x_dir=(0, 1, 0), z_dir=(0, 0, -1))):
            Polygon((0, -3), (1.42, -3), (1.42, 2.58), (1.84, 3), (0, 3), align=None)
        hole1_2 = revolve(axis=Axis((0, 62.553629026, 27.6225), (1, 0, 0)), mode=Mode.SUBTRACT)

    # Hole1 3 outline → Hole1 3 (revolve, cut)
    with SkipClean():  # the faces are left unmerged after this step: merging them gives an invalid solid
        with BuildSketch(Plane(origin=(0, 46.553629026, 27.6225), x_dir=(0, 1, 0), z_dir=(0, 0, -1))):
            Polygon((0, -3), (1.42, -3), (1.42, 2.58), (1.84, 3), (0, 3), align=None)
        hole1_3 = revolve(axis=Axis((0, 46.553629026, 27.6225), (1, 0, 0)), mode=Mode.SUBTRACT)

    # Hole1 4 outline → Hole1 4 (revolve, cut)
    with SkipClean():  # the faces are left unmerged after this step: merging them gives an invalid solid
        with BuildSketch(Plane(origin=(0, 62.553629026, -27.6225), x_dir=(0, 1, 0), z_dir=(0, 0, -1))):
            Polygon((0, -3), (1.42, -3), (1.42, 2.58), (1.84, 3), (0, 3), align=None)
        hole1_4 = revolve(axis=Axis((0, 62.553629026, -27.6225), (1, 0, 0)), mode=Mode.SUBTRACT)

    # Mirror1: Hole1, Hole1 2, Hole1 3, Hole1 4 across plane
    with SkipClean():  # the faces are left unmerged after this step: merging them gives an invalid solid
        add(hole1.mirror(Plane(origin=(0, 0, 0), x_dir=(0, 0, 1), z_dir=(1, 0, 0))), mode=Mode.SUBTRACT)
        add(hole1_2.mirror(Plane(origin=(0, 0, 0), x_dir=(0, 0, 1), z_dir=(1, 0, 0))), mode=Mode.SUBTRACT)
        add(hole1_3.mirror(Plane(origin=(0, 0, 0), x_dir=(0, 0, 1), z_dir=(1, 0, 0))), mode=Mode.SUBTRACT)
        add(hole1_4.mirror(Plane(origin=(0, 0, 0), x_dir=(0, 0, 1), z_dir=(1, 0, 0))), mode=Mode.SUBTRACT)

    # Sketch12 → Cut-Extrude6 (cut, symmetric)
    with SkipClean():  # the faces are left unmerged after this step: merging them gives an invalid solid
        with BuildSketch(Plane(origin=(0, 0, 0), x_dir=(0, 0, -1), z_dir=(1, 0, 0))):
            with Locations((-27.6225, 62.553629026)):
                Circle(SKETCH12_R)
            with Locations((-27.6225, 46.553629026)):
                Circle(SKETCH12_R)
            with Locations((27.6225, 62.553629026)):
                Circle(SKETCH12_R)
            with Locations((27.6225, 46.553629026)):
                Circle(SKETCH12_R)
        extrude(amount=CUT_EXTRUDE6_DEPTH, both=True, mode=Mode.SUBTRACT)


solid = part.part
